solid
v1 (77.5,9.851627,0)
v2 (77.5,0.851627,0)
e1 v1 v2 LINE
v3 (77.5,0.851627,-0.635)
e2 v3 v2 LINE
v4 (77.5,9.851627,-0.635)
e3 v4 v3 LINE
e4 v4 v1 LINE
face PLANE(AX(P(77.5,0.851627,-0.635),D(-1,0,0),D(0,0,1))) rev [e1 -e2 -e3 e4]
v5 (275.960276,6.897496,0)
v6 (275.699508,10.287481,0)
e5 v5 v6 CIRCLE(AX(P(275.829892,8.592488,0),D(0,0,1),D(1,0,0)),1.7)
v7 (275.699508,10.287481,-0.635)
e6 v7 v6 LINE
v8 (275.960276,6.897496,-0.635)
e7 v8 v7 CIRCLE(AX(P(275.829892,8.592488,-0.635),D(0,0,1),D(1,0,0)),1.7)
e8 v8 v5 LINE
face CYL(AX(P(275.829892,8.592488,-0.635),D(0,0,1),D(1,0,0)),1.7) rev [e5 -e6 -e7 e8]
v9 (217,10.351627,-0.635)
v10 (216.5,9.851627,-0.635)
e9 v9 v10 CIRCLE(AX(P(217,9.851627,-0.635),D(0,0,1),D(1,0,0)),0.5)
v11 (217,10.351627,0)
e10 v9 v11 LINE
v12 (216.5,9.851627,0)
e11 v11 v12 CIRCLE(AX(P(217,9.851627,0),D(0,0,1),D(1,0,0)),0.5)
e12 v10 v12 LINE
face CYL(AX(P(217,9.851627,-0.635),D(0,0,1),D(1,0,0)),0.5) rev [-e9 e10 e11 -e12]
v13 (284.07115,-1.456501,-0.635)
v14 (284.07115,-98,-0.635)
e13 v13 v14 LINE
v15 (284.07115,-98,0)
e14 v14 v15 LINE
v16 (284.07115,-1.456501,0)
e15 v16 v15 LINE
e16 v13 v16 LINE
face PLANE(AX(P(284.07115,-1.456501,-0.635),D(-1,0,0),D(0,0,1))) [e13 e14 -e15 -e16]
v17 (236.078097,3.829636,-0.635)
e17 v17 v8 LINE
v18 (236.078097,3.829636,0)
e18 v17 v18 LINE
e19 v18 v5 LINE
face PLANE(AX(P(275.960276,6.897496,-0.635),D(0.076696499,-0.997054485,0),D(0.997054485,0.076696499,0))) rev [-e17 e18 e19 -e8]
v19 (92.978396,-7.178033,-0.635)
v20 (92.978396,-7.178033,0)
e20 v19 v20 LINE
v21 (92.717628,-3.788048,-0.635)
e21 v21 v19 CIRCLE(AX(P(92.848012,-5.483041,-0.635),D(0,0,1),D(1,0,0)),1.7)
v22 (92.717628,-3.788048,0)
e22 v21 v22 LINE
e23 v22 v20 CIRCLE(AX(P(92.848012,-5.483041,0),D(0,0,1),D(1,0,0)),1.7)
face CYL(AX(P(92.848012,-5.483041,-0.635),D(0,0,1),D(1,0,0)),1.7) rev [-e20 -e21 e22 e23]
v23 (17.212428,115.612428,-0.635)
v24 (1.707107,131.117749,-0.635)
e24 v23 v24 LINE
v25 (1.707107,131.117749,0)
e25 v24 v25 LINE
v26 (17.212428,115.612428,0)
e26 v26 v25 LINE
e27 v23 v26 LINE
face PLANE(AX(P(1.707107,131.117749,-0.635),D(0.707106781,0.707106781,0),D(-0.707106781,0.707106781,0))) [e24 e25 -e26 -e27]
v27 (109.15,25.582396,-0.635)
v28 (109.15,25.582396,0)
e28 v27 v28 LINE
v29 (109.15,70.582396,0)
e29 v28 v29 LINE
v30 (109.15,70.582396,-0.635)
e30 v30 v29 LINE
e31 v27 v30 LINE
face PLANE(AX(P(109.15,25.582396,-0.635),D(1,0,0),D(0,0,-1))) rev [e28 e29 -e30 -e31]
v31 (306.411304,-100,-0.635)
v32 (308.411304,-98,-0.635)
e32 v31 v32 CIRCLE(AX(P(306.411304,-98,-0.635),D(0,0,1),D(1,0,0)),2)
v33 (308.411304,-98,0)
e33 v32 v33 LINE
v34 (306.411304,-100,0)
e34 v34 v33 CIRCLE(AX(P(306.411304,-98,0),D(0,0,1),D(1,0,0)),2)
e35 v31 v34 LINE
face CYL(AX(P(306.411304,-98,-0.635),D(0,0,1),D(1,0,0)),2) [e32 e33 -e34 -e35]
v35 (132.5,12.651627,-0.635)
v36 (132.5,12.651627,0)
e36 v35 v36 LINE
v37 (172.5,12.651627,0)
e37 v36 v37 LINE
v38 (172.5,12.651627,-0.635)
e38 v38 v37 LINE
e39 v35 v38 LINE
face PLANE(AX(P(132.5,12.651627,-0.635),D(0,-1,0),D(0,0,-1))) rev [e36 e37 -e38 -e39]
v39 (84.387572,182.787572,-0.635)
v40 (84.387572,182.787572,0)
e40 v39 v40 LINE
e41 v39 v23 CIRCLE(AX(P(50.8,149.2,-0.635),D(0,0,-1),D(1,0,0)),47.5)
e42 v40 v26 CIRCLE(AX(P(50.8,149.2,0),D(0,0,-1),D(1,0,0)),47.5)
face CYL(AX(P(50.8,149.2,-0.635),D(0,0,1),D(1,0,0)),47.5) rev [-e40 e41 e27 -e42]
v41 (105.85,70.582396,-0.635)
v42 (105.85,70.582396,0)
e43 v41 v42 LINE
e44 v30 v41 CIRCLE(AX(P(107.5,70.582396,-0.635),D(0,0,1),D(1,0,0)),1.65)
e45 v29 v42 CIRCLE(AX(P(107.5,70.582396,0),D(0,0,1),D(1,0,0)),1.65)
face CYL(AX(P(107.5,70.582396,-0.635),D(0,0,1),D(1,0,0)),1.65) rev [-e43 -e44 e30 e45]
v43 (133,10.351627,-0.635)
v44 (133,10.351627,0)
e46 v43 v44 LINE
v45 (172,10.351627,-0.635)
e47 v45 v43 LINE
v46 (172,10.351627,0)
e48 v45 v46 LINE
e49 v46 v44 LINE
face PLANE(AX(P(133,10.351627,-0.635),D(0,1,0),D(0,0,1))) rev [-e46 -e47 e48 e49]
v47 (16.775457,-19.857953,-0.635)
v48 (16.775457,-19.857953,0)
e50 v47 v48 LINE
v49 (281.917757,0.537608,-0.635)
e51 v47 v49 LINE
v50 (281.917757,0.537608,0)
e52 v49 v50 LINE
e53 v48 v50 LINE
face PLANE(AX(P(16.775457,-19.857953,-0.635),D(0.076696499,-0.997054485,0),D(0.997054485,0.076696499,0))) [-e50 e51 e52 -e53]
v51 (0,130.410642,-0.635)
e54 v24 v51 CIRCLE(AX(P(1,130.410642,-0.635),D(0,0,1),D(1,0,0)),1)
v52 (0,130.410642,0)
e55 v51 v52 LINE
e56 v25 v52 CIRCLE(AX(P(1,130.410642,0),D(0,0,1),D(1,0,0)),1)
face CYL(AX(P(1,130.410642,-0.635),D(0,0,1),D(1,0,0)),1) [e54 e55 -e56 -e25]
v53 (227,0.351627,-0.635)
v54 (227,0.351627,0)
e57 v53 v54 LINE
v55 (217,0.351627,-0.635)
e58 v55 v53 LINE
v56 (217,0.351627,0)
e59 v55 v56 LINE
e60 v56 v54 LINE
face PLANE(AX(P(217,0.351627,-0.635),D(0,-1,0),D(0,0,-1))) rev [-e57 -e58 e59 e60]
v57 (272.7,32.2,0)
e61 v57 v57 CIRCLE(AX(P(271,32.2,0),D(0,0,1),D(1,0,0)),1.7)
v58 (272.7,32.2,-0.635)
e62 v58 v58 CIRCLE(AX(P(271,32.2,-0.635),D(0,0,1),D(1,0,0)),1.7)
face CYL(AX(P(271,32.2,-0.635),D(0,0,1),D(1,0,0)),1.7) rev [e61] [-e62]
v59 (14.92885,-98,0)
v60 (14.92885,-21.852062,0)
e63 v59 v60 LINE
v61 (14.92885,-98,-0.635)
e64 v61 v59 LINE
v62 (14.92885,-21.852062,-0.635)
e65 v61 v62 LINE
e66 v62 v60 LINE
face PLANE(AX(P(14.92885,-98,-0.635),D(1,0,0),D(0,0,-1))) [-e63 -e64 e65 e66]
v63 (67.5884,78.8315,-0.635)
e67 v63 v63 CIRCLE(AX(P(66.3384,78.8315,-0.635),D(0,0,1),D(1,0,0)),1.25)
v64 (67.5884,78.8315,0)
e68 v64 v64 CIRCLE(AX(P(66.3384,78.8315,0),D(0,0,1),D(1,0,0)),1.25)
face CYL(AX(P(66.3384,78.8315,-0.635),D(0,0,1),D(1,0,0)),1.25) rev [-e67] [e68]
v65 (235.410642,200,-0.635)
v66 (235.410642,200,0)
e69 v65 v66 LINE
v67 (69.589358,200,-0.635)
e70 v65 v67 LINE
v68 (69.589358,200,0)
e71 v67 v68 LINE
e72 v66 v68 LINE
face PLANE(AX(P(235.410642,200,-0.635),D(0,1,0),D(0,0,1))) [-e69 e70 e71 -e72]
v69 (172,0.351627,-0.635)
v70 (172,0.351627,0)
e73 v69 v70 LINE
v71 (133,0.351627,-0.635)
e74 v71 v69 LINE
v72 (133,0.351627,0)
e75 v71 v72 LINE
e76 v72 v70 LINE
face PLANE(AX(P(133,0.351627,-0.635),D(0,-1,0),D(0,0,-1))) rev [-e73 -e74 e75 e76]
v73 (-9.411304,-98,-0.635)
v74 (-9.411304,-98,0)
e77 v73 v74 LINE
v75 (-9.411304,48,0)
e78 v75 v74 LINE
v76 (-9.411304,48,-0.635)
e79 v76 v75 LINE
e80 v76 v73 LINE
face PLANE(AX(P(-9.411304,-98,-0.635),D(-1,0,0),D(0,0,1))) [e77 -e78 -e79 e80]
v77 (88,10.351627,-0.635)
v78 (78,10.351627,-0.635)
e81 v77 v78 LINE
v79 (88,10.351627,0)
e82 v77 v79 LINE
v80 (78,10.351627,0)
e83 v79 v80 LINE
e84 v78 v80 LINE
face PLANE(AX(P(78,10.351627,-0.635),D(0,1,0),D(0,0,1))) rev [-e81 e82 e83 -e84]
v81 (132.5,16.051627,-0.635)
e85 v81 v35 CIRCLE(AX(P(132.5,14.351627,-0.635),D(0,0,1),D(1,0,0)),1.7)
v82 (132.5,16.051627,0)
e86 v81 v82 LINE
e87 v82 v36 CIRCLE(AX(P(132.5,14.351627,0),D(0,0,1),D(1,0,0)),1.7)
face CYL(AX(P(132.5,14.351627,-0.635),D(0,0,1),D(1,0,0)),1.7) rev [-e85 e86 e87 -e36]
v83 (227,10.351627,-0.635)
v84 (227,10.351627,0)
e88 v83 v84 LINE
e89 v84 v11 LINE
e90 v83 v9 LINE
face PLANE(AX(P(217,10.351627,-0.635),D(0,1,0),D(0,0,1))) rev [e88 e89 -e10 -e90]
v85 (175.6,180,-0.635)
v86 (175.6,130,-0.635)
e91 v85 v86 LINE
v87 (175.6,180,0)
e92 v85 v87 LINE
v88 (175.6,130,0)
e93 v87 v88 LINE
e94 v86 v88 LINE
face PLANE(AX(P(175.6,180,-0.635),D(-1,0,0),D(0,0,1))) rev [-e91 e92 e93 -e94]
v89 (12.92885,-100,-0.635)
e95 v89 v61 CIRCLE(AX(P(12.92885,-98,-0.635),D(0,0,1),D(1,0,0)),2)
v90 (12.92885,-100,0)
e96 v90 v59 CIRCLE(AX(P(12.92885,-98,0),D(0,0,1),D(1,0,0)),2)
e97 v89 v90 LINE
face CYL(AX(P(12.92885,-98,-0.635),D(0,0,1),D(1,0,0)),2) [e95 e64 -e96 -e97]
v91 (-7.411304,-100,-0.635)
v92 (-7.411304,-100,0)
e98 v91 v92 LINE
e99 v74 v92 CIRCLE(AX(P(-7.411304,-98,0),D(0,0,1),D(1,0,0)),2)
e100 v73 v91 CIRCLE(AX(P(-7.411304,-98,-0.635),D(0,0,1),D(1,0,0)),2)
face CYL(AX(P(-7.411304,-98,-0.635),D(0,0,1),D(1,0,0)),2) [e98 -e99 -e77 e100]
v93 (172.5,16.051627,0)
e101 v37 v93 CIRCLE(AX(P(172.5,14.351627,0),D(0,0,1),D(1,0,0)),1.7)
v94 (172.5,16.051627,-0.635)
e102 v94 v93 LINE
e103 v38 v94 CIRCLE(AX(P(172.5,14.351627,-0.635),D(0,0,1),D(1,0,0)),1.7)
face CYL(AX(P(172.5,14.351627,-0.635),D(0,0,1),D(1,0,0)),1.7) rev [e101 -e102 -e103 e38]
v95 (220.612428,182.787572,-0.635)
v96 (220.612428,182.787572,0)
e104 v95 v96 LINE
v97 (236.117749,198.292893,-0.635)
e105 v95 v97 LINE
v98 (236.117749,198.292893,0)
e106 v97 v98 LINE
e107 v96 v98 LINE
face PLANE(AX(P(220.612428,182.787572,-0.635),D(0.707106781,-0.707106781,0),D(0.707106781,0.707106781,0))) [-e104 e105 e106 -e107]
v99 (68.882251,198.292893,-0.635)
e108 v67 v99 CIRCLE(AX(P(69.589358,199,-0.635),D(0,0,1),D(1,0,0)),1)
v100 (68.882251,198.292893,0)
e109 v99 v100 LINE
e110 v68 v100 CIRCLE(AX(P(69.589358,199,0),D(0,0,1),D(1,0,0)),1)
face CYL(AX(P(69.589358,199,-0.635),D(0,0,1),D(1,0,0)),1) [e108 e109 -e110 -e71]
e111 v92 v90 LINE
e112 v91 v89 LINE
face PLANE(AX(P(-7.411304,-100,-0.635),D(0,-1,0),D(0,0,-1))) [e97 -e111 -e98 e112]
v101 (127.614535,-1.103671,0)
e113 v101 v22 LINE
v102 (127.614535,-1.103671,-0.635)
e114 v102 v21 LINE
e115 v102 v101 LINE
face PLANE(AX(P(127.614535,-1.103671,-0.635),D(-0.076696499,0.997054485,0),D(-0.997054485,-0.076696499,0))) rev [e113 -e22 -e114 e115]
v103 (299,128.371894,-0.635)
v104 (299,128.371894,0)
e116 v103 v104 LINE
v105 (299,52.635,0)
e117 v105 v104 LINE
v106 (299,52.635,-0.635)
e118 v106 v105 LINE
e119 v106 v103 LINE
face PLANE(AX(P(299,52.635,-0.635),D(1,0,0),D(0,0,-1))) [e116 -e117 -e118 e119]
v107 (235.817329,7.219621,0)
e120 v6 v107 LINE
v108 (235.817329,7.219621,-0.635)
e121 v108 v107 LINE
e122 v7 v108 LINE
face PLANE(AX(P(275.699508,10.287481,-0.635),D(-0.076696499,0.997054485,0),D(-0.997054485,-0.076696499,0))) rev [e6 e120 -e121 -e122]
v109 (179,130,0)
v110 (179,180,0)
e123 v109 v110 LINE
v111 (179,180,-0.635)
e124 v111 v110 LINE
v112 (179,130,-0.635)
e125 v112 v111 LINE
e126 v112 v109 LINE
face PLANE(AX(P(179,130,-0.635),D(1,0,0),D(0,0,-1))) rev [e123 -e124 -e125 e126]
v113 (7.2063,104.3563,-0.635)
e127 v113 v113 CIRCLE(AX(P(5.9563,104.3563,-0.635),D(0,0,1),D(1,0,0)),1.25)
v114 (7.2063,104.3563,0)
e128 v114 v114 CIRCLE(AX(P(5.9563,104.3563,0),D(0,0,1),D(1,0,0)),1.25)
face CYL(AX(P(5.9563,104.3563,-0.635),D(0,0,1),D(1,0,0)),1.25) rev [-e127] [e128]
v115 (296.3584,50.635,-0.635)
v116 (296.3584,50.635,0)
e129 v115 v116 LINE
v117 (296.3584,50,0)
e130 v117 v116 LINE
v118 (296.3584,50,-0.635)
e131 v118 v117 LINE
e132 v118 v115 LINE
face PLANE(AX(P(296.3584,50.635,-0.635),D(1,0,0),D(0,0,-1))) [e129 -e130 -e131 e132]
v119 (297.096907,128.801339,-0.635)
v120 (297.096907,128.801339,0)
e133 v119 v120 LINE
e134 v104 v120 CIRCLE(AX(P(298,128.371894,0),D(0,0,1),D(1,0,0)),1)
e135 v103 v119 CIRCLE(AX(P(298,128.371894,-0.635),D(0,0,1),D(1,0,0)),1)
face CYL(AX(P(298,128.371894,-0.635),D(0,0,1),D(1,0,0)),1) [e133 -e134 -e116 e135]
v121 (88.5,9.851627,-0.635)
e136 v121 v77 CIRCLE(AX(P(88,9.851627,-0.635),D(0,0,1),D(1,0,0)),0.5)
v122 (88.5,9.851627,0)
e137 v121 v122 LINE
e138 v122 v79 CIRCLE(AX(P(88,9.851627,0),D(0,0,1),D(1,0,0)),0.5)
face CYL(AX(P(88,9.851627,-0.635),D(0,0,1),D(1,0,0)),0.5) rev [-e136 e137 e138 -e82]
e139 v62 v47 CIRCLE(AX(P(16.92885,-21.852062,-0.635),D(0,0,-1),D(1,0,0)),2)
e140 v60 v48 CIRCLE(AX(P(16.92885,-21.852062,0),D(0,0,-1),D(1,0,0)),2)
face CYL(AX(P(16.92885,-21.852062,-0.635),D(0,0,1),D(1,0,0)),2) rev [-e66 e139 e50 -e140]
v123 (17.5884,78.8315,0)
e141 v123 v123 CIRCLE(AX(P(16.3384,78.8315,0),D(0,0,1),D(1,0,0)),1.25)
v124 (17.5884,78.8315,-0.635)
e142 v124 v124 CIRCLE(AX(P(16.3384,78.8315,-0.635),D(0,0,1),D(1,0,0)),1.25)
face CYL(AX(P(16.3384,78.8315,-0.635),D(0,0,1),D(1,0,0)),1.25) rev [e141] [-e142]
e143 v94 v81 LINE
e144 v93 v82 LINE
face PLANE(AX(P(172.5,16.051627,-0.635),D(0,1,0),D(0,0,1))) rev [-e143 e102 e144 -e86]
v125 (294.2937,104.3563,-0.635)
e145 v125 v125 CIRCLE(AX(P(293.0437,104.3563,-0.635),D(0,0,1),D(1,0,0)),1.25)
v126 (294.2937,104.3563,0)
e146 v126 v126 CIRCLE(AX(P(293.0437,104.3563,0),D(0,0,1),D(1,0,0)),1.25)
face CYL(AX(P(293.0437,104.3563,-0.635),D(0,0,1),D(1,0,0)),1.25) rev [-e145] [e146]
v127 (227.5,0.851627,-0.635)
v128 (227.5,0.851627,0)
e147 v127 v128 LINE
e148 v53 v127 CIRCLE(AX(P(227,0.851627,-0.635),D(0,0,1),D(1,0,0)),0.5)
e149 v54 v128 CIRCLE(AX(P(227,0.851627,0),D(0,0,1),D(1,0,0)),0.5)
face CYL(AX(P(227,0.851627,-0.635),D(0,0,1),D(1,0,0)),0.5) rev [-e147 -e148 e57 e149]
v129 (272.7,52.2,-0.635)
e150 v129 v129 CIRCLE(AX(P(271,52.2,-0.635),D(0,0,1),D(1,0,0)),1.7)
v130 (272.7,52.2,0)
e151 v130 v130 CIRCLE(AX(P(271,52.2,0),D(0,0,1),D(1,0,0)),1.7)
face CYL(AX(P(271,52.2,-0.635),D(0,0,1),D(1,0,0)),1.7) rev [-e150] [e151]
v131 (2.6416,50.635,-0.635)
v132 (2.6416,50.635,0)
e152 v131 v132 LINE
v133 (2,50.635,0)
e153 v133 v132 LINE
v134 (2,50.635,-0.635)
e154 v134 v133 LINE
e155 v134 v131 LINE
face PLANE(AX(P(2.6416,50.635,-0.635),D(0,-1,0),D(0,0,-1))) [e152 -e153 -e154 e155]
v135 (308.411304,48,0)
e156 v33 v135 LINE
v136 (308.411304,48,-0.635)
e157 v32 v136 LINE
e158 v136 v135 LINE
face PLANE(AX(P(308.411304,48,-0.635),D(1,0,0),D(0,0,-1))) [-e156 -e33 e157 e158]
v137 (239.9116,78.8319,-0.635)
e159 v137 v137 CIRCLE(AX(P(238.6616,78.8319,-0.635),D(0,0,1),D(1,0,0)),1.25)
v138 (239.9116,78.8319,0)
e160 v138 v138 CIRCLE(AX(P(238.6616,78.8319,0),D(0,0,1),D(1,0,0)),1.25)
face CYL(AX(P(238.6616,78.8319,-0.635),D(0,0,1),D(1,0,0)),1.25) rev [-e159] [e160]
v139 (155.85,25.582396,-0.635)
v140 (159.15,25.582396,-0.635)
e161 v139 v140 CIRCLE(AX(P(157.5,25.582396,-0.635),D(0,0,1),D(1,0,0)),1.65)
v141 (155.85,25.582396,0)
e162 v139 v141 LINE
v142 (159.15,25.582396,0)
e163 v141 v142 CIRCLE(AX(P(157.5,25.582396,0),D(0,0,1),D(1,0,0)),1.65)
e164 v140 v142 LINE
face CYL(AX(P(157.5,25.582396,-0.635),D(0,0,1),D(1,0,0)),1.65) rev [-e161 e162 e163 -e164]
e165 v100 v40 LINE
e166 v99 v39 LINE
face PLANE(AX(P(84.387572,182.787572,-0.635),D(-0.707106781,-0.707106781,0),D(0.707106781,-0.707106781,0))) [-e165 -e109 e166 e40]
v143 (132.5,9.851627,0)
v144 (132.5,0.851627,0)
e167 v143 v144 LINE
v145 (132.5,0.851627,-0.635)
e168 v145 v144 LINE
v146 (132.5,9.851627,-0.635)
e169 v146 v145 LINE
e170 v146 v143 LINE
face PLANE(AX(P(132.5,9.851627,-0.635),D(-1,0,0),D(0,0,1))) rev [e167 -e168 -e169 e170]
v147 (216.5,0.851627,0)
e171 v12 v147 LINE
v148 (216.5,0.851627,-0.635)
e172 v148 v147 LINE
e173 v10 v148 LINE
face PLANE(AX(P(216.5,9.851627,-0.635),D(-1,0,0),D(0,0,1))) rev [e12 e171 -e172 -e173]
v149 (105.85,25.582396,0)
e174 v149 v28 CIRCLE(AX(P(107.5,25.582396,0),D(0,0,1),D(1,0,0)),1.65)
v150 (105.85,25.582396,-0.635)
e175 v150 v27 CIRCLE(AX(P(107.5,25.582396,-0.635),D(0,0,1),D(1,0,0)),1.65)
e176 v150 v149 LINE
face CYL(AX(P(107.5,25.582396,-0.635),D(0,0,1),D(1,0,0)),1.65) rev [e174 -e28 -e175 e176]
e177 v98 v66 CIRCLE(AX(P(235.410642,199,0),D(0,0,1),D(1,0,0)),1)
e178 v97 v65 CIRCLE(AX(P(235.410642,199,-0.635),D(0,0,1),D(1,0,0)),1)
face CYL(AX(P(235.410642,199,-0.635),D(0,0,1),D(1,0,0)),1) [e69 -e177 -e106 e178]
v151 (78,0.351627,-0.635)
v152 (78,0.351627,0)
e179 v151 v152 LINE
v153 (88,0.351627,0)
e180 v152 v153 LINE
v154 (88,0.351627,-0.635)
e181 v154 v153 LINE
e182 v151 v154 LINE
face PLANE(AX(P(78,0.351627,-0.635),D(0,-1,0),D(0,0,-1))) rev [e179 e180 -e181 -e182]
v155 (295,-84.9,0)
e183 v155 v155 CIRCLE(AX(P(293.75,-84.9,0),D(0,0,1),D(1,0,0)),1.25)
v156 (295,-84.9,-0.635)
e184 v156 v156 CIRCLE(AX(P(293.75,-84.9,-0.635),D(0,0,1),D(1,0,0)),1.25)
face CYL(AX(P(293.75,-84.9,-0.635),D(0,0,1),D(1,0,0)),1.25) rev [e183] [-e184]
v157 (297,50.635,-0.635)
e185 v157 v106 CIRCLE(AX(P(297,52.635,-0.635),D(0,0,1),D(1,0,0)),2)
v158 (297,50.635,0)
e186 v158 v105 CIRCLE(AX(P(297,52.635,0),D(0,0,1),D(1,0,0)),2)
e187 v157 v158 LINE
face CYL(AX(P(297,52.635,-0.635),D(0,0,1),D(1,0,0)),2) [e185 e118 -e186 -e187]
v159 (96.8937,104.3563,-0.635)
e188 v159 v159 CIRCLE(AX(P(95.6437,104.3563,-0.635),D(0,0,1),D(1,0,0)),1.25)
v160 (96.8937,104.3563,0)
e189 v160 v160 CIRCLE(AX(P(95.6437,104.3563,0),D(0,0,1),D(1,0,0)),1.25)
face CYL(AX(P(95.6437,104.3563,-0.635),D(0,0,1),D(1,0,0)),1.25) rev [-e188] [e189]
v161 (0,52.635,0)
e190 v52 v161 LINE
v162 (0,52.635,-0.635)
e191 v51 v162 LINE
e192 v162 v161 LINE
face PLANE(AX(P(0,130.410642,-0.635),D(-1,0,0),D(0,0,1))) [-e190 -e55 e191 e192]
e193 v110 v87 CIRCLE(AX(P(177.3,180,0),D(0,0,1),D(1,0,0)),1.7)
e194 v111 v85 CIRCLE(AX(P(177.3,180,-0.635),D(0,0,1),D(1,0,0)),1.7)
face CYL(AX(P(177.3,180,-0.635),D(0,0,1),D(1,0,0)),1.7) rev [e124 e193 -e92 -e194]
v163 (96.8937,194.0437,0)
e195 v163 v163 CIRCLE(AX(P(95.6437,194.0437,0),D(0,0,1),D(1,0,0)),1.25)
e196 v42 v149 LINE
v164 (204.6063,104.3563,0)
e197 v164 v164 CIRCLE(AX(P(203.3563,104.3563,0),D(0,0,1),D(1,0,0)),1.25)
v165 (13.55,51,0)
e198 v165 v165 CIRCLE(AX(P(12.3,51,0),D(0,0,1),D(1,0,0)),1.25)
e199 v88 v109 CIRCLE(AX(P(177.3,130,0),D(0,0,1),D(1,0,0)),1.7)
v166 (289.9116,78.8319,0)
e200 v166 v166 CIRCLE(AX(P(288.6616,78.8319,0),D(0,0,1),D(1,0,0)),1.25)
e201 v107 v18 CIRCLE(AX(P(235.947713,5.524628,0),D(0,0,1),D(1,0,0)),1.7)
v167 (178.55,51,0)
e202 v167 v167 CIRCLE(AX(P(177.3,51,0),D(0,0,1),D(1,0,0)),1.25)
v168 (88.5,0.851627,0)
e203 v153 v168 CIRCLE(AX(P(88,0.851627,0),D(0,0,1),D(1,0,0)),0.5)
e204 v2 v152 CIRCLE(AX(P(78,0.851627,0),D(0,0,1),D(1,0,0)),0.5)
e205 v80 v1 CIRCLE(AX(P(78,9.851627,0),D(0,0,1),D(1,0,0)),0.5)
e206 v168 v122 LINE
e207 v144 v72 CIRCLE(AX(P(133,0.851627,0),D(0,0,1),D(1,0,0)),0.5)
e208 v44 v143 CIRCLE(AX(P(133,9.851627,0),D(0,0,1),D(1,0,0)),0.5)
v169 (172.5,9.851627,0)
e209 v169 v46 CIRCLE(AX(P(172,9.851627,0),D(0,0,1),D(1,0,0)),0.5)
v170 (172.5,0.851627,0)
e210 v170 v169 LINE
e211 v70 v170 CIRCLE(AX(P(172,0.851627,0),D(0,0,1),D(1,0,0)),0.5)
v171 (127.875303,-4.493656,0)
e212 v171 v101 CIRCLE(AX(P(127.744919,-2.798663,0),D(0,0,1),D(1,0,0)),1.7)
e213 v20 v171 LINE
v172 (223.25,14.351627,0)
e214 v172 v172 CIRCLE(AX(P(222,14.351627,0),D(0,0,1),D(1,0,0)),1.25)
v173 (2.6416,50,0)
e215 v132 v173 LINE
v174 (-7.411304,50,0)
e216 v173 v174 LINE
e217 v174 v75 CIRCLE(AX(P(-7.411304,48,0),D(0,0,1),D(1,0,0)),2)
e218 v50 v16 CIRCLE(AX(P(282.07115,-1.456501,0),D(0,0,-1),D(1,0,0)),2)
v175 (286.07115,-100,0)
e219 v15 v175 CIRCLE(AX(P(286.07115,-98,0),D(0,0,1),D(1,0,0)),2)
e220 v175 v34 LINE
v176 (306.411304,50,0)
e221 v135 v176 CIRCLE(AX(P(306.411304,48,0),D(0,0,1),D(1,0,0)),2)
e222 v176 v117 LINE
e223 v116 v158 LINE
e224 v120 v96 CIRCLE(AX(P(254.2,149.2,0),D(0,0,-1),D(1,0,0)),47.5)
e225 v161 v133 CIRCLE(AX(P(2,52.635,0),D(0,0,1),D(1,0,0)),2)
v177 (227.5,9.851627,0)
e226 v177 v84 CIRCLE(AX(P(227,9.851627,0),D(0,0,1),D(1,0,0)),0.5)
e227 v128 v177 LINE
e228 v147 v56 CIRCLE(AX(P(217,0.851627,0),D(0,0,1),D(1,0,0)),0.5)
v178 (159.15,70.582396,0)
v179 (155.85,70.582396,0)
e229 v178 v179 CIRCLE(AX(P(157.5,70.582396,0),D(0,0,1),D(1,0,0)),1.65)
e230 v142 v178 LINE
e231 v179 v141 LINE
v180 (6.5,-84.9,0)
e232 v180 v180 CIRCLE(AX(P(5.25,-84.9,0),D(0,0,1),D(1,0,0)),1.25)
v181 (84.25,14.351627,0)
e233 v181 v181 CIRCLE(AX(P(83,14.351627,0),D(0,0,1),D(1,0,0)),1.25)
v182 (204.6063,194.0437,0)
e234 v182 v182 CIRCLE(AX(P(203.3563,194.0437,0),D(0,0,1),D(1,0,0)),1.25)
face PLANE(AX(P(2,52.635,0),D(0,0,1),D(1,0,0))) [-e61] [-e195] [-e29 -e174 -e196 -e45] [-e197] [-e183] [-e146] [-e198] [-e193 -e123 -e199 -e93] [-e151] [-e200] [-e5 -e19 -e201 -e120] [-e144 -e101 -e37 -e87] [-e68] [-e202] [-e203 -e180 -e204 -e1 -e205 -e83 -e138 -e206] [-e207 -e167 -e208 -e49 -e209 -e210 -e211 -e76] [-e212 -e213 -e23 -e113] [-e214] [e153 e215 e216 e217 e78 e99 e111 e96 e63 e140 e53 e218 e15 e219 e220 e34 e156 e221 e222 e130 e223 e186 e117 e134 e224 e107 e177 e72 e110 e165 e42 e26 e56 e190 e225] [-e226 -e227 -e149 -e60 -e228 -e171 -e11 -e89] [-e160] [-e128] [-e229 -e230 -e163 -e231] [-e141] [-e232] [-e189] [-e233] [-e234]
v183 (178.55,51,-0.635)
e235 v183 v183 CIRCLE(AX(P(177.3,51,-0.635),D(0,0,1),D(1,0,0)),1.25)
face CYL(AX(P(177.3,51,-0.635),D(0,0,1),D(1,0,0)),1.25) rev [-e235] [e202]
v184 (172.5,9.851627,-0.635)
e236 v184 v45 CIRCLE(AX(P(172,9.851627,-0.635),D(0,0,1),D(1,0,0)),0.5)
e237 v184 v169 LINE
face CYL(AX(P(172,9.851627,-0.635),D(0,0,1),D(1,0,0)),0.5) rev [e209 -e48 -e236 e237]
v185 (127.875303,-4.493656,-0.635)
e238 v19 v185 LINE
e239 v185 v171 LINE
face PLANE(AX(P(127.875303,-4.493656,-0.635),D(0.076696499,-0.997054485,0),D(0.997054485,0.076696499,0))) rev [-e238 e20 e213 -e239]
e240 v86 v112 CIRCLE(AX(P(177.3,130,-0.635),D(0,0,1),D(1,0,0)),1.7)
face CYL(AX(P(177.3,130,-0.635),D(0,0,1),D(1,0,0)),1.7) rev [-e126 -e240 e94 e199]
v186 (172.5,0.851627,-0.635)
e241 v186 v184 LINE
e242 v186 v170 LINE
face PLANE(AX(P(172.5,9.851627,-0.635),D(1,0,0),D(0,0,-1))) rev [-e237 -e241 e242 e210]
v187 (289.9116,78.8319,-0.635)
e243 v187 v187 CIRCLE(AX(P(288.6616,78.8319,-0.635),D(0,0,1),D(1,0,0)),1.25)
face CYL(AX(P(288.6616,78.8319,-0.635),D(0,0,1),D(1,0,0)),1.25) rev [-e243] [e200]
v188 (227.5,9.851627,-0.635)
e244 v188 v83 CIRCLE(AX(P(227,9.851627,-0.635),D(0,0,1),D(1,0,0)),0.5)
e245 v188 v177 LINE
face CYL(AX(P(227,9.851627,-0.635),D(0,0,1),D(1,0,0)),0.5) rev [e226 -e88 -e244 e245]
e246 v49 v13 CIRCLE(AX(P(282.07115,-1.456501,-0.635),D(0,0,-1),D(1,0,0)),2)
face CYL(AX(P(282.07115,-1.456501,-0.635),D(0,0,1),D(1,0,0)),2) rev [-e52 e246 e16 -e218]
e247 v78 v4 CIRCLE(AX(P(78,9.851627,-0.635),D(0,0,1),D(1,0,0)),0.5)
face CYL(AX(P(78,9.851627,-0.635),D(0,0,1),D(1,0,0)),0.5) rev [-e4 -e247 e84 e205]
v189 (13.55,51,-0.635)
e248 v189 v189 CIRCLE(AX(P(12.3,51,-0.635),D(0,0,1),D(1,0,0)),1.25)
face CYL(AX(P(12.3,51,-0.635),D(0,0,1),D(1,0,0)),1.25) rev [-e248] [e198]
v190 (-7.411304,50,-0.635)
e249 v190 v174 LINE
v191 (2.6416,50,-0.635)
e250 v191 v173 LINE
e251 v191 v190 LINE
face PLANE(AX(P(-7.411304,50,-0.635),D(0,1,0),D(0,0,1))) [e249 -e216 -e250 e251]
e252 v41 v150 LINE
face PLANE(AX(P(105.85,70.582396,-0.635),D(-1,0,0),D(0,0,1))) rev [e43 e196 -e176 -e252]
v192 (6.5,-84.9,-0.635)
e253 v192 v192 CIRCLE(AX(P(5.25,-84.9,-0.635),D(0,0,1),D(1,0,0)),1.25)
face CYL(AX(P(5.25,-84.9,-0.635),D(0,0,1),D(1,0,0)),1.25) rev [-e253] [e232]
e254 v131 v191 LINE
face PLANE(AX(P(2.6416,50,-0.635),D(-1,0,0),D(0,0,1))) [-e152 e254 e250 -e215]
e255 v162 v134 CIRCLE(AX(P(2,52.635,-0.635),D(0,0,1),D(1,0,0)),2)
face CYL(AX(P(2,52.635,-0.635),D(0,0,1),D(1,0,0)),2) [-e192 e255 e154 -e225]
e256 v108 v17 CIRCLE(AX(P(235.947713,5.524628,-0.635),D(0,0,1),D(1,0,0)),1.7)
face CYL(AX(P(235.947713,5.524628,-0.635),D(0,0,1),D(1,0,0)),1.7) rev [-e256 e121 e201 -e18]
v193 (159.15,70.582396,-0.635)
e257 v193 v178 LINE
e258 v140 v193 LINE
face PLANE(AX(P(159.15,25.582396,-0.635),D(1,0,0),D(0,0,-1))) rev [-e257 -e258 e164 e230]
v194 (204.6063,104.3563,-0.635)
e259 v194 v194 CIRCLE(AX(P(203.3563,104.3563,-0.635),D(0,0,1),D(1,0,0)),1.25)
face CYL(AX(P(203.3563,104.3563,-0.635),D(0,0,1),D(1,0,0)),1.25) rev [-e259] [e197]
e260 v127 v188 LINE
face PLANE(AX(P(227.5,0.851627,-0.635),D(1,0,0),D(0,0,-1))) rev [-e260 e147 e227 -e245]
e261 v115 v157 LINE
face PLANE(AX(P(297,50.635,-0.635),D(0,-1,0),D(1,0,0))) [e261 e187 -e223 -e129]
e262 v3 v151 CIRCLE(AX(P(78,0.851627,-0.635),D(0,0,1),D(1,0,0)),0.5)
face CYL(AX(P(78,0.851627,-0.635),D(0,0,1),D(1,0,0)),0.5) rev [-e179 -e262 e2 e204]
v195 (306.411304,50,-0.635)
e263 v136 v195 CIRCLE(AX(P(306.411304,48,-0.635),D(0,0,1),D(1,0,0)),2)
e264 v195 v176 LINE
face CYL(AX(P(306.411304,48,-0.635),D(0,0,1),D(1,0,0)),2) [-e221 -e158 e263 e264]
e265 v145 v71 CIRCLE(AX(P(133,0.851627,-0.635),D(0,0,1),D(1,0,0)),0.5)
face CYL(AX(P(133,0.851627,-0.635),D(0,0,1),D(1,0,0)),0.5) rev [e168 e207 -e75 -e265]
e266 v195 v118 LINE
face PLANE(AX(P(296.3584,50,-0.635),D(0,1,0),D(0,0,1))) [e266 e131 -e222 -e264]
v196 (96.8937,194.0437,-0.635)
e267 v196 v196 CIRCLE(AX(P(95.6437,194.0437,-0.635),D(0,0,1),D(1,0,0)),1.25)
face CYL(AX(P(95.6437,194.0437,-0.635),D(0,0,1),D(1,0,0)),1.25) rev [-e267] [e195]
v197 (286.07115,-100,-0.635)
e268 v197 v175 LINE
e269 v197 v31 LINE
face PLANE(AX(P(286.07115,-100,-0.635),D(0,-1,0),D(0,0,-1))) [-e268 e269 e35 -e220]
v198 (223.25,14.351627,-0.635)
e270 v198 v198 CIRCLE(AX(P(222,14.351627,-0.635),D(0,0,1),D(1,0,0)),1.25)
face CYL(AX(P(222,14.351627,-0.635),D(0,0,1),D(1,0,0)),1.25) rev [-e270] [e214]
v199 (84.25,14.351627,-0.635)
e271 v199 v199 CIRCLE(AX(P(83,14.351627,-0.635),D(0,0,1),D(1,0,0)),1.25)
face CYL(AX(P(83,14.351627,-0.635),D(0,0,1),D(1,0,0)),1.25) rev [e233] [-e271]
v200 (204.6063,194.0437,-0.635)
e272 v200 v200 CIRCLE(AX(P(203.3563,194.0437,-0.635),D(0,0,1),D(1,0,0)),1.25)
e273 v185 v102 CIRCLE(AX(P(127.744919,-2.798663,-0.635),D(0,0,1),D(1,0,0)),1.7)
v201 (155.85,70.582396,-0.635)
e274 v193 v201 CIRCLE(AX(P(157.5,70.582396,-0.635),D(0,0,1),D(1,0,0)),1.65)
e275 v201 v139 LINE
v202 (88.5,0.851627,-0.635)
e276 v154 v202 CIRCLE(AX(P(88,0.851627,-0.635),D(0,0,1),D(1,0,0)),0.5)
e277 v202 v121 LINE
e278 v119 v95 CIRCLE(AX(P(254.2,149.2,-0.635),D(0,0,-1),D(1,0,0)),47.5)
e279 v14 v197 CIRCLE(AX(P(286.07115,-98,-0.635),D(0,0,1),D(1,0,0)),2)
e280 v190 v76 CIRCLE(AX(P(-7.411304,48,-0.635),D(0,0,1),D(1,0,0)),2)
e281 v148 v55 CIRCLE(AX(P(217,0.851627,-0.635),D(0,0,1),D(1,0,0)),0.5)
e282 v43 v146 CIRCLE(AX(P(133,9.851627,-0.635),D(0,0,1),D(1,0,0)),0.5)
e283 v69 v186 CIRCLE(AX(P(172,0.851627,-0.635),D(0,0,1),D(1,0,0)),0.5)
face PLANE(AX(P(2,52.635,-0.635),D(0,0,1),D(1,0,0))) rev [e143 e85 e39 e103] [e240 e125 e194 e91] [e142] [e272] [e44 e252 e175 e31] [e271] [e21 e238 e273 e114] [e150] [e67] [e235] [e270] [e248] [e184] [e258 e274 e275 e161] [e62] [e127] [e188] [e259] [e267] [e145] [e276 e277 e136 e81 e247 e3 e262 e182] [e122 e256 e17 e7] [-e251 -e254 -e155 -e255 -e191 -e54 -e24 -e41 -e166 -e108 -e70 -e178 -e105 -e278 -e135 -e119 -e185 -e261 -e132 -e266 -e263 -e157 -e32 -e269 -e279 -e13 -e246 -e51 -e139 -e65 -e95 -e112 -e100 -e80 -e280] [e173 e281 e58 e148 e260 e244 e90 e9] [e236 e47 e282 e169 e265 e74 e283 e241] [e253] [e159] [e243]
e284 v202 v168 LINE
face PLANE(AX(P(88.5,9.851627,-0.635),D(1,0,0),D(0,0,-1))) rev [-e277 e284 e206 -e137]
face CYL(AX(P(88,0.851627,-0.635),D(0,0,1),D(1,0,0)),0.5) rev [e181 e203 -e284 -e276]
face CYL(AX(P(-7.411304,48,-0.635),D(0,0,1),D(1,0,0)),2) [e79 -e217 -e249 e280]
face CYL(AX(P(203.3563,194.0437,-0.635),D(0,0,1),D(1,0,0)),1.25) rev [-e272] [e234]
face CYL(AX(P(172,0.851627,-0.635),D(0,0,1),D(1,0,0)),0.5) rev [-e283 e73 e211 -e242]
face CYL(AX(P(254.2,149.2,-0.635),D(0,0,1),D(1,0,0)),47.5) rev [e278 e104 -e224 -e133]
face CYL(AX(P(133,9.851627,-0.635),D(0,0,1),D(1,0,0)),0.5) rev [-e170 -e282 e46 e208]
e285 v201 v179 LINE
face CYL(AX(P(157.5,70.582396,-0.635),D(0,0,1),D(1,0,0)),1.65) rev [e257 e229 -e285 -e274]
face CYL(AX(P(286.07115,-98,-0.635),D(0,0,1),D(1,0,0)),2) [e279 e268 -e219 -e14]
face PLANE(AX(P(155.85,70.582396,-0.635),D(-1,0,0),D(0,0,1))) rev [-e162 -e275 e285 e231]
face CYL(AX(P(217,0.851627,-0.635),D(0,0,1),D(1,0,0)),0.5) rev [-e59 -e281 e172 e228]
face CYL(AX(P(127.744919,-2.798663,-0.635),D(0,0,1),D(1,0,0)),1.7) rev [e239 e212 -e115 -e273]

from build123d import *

# Parameters (mm, degrees)
MODEL_R            = 1.25
MODEL_R_2          = 1.7
BASE_FLANGE1_DEPTH = 0.635


# Sheet-metal steps are written as plain solids
with BuildPart() as part:
    # Model → Base-Flange1 (new body)
    with BuildSketch(Plane.XY):
        with BuildLine():
            Line((0, 130.410642225), (0, 52.635))
            ThreePointArc((0, 52.635), (0.585786438, 51.220786438), (2, 50.635))
            Line((2, 50.635), (2.6416, 50.635))
            Line((2.6416, 50.635), (2.6416, 50))
            Line((2.6416, 50), (-7.411304242, 50))
            ThreePointArc((-7.411304242, 50), (-8.825517804, 49.414213562), (-9.411304242, 48))
            Line((-9.411304242, 48), (-9.411304242, -98))
            ThreePointArc((-9.411304242, -98), (-8.825517804, -99.414213562), (-7.411304242, -100))
            Line((-7.411304242, -100), (12.92885, -100))
            ThreePointArc((12.92885, -100), (14.343063562, -99.414213562), (14.92885, -98))
            Line((14.92885, -98), (14.92885, -21.852062278))
            ThreePointArc((14.92885, -21.852062278), (15.461405624, -20.493163091), (16.775457002, -19.857953307))
            Line((16.775457002, -19.857953307), (281.917757002, 0.537608254))
            ThreePointArc((281.917757002, 0.537608254), (283.430049188, 0.01094366), (284.07115, -1.456500717))
            Line((284.07115, -1.456500717), (284.07115, -98))
            ThreePointArc((284.07115, -98), (284.656936438, -99.414213562), (286.07115, -100))
            Line((286.07115, -100), (306.411304242, -100))
            ThreePointArc((306.411304242, -100), (307.825517804, -99.414213562), (308.411304242, -98))
            Line((308.411304242, -98), (308.411304242, 48))
            ThreePointArc((308.411304242, 48), (307.825517804, 49.414213562), (306.411304242, 50))
            Line((306.411304242, 50), (296.3584, 50))
            Line((296.3584, 50), (296.3584, 50.635))
            Line((296.3584, 50.635), (297, 50.635))
            ThreePointArc((297, 50.635), (298.414213562, 51.220786438), (299, 52.635))
            Line((299, 52.635), (299, 128.371893989))
            ThreePointArc((299, 128.371893989), (298.220121803, 129.347366383), (297.096907217, 128.801339474))
            ThreePointArc((297.096907217, 128.801339474), (226.808500251, 110.393354416), (220.612427894, 182.787572106))
            Line((220.612427894, 182.787572106), (236.117749006, 198.292893219))
            ThreePointArc((236.117749006, 198.292893219), (236.334521757, 199.382683432), (235.410642225, 200))
            Line((235.410642225, 200), (69.589357776, 200))
            ThreePointArc((69.589357776, 200), (68.665478243, 199.382683432), (68.882250994, 198.292893219))
            Line((68.882250994, 198.292893219), (84.387572107, 182.787572107))
            ThreePointArc((84.387572107, 182.787572107), (84.387572107, 115.612427894), (17.212427894, 115.612427894))
            Line((17.212427894, 115.612427894), (1.707106781, 131.117749006))
            ThreePointArc((1.707106781, 131.117749006), (0.617316568, 131.334521758), (0, 130.410642225))
        make_face()
        with Locations((177.3, 51)):
            Circle(MODEL_R, mode=Mode.SUBTRACT)
        with Locations((12.3, 51)):
            Circle(MODEL_R, mode=Mode.SUBTRACT)
        with Locations((271, 32.2)):
            Circle(MODEL_R_2, mode=Mode.SUBTRACT)
        with Locations((271, 52.2)):
            Circle(MODEL_R_2, mode=Mode.SUBTRACT)
        with Locations((5.25, -84.9)):
            Circle(MODEL_R, mode=Mode.SUBTRACT)
        with Locations((293.75, -84.9)):
            Circle(MODEL_R, mode=Mode.SUBTRACT)
        with Locations((83, 14.351626942)):
            Circle(MODEL_R, mode=Mode.SUBTRACT)
        with Locations((222, 14.351626942)):
            Circle(MODEL_R, mode=Mode.SUBTRACT)
        with Locations((238.6616, 78.8319)):
            Circle(MODEL_R, mode=Mode.SUBTRACT)
        with Locations((16.3384, 78.8315)):
            Circle(MODEL_R, mode=Mode.SUBTRACT)
        with Locations((203.3563, 104.3563)):
            Circle(MODEL_R, mode=Mode.SUBTRACT)
        with Locations((95.6437, 104.3563)):
            Circle(MODEL_R, mode=Mode.SUBTRACT)
        with Locations((95.6437, 194.0437)):
            Circle(MODEL_R, mode=Mode.SUBTRACT)
        with Locations((5.9563, 104.3563)):
            Circle(MODEL_R, mode=Mode.SUBTRACT)
        with Locations((203.3563, 194.0437)):
            Circle(MODEL_R, mode=Mode.SUBTRACT)
        with Locations((293.0437, 104.3563)):
            Circle(MODEL_R, mode=Mode.SUBTRACT)
        with Locations((66.3384, 78.8315)):
            Circle(MODEL_R, mode=Mode.SUBTRACT)
        with Locations((288.6616, 78.8319)):
            Circle(MODEL_R, mode=Mode.SUBTRACT)
        with BuildLine():
            Line((179, 130), (179, 180))
            ThreePointArc((179, 180), (177.3, 181.7), (175.6, 180))
            Line((175.6, 180), (175.6, 130))
            ThreePointArc((175.6, 130), (177.3, 128.3), (179, 130))
        make_face(mode=Mode.SUBTRACT)
        with BuildLine():
            Line((155.85, 70.582396166), (155.85, 25.582396166))
            ThreePointArc((155.85, 25.582396166), (157.5, 23.932396166), (159.15, 25.582396166))
            Line((159.15, 25.582396166), (159.15, 70.582396166))
            ThreePointArc((159.15, 70.582396166), (157.5, 72.232396166), (155.85, 70.582396166))
        make_face(mode=Mode.SUBTRACT)
        with BuildLine():
            Line((109.15, 25.582396166), (109.15, 70.582396166))
            ThreePointArc((109.15, 70.582396166), (107.5, 72.232396166), (105.85, 70.582396166))
            Line((105.85, 70.582396166), (105.85, 25.582396166))
            ThreePointArc((105.85, 25.582396166), (107.5, 23.932396166), (109.15, 25.582396166))
        make_face(mode=Mode.SUBTRACT)
        with BuildLine():
            Line((172.5, 16.051626942), (132.5, 16.051626942))
            ThreePointArc((132.5, 16.051626942), (130.8, 14.351626942), (132.5, 12.651626942))
            Line((132.5, 12.651626942), (172.5, 12.651626942))
            ThreePointArc((172.5, 12.651626942), (174.2, 14.351626942), (172.5, 16.051626942))
        make_face(mode=Mode.SUBTRACT)
        with BuildLine():
            Line((275.699508159, 10.287481051), (235.81732874, 7.219621092))
            ThreePointArc((235.81732874, 7.219621092), (234.252720163, 5.394244419), (236.078096836, 3.829635842))
            Line((236.078096836, 3.829635842), (275.960276256, 6.8974958))
            ThreePointArc((275.960276256, 6.8974958), (277.524884833, 8.722872474), (275.699508159, 10.287481051))
        make_face(mode=Mode.SUBTRACT)
        with BuildLine():
            Line((77.5, 0.851626942), (77.5, 9.851626942))
            ThreePointArc((77.5, 9.851626942), (77.64644661, 10.205180332), (78, 10.351626942))
            Line((78, 10.351626942), (88, 10.351626942))
            ThreePointArc((88, 10.351626942), (88.353553391, 10.205180332), (88.5, 9.851626942))
            Line((88.5, 9.851626942), (88.5, 0.851626942))
            ThreePointArc((88.5, 0.851626942), (88.353553391, 0.498073551), (88, 0.351626942))
            Line((88, 0.351626942), (78, 0.351626942))
            ThreePointArc((78, 0.351626942), (77.64644661, 0.498073551), (77.5, 0.851626942))
        make_face(mode=Mode.SUBTRACT)
        with BuildLine():
            Line((216.5, 9.851626942), (216.5, 0.851626942))
            ThreePointArc((216.5, 0.851626942), (216.64644661, 0.498073551), (217, 0.351626942))
            Line((217, 0.351626942), (227, 0.351626942))
            ThreePointArc((227, 0.351626942), (227.353553391, 0.498073551), (227.5, 0.851626942))
            Line((227.5, 0.851626942), (227.5, 9.851626942))
            ThreePointArc((227.5, 9.851626942), (227.353553391, 10.205180332), (227, 10.351626942))
            Line((227, 10.351626942), (217, 10.351626942))
            ThreePointArc((217, 10.351626942), (216.64644661, 10.205180332), (216.5, 9.851626942))
        make_face(mode=Mode.SUBTRACT)
        with BuildLine():
            Line((132.5, 9.851626942), (132.5, 0.851626942))
            ThreePointArc((132.5, 0.851626942), (132.64644661, 0.498073551), (133, 0.351626942))
            Line((133, 0.351626942), (172, 0.351626942))
            ThreePointArc((172, 0.351626942), (172.353553391, 0.498073551), (172.5, 0.851626942))
            Line((172.5, 0.851626942), (172.5, 9.851626942))
            ThreePointArc((172.5, 9.851626942), (172.353553391, 10.205180332), (172, 10.351626942))
            Line((172, 10.351626942), (133, 10.351626942))
            ThreePointArc((133, 10.351626942), (132.64644661, 10.205180332), (132.5, 9.851626942))
        make_face(mode=Mode.SUBTRACT)
        with BuildLine():
            Line((127.875303432, -4.493655968), (92.97839644, -7.178033432))
            ThreePointArc((92.97839644, -7.178033432), (91.153019766, -5.613424855), (92.717628343, -3.788048182))
            Line((92.717628343, -3.788048182), (127.614535335, -1.103670718))
            ThreePointArc((127.614535335, -1.103670718), (129.439912009, -2.668279295), (127.875303432, -4.493655968))
        make_face(mode=Mode.SUBTRACT)
    extrude(amount=-BASE_FLANGE1_DEPTH)


solid = part.part
